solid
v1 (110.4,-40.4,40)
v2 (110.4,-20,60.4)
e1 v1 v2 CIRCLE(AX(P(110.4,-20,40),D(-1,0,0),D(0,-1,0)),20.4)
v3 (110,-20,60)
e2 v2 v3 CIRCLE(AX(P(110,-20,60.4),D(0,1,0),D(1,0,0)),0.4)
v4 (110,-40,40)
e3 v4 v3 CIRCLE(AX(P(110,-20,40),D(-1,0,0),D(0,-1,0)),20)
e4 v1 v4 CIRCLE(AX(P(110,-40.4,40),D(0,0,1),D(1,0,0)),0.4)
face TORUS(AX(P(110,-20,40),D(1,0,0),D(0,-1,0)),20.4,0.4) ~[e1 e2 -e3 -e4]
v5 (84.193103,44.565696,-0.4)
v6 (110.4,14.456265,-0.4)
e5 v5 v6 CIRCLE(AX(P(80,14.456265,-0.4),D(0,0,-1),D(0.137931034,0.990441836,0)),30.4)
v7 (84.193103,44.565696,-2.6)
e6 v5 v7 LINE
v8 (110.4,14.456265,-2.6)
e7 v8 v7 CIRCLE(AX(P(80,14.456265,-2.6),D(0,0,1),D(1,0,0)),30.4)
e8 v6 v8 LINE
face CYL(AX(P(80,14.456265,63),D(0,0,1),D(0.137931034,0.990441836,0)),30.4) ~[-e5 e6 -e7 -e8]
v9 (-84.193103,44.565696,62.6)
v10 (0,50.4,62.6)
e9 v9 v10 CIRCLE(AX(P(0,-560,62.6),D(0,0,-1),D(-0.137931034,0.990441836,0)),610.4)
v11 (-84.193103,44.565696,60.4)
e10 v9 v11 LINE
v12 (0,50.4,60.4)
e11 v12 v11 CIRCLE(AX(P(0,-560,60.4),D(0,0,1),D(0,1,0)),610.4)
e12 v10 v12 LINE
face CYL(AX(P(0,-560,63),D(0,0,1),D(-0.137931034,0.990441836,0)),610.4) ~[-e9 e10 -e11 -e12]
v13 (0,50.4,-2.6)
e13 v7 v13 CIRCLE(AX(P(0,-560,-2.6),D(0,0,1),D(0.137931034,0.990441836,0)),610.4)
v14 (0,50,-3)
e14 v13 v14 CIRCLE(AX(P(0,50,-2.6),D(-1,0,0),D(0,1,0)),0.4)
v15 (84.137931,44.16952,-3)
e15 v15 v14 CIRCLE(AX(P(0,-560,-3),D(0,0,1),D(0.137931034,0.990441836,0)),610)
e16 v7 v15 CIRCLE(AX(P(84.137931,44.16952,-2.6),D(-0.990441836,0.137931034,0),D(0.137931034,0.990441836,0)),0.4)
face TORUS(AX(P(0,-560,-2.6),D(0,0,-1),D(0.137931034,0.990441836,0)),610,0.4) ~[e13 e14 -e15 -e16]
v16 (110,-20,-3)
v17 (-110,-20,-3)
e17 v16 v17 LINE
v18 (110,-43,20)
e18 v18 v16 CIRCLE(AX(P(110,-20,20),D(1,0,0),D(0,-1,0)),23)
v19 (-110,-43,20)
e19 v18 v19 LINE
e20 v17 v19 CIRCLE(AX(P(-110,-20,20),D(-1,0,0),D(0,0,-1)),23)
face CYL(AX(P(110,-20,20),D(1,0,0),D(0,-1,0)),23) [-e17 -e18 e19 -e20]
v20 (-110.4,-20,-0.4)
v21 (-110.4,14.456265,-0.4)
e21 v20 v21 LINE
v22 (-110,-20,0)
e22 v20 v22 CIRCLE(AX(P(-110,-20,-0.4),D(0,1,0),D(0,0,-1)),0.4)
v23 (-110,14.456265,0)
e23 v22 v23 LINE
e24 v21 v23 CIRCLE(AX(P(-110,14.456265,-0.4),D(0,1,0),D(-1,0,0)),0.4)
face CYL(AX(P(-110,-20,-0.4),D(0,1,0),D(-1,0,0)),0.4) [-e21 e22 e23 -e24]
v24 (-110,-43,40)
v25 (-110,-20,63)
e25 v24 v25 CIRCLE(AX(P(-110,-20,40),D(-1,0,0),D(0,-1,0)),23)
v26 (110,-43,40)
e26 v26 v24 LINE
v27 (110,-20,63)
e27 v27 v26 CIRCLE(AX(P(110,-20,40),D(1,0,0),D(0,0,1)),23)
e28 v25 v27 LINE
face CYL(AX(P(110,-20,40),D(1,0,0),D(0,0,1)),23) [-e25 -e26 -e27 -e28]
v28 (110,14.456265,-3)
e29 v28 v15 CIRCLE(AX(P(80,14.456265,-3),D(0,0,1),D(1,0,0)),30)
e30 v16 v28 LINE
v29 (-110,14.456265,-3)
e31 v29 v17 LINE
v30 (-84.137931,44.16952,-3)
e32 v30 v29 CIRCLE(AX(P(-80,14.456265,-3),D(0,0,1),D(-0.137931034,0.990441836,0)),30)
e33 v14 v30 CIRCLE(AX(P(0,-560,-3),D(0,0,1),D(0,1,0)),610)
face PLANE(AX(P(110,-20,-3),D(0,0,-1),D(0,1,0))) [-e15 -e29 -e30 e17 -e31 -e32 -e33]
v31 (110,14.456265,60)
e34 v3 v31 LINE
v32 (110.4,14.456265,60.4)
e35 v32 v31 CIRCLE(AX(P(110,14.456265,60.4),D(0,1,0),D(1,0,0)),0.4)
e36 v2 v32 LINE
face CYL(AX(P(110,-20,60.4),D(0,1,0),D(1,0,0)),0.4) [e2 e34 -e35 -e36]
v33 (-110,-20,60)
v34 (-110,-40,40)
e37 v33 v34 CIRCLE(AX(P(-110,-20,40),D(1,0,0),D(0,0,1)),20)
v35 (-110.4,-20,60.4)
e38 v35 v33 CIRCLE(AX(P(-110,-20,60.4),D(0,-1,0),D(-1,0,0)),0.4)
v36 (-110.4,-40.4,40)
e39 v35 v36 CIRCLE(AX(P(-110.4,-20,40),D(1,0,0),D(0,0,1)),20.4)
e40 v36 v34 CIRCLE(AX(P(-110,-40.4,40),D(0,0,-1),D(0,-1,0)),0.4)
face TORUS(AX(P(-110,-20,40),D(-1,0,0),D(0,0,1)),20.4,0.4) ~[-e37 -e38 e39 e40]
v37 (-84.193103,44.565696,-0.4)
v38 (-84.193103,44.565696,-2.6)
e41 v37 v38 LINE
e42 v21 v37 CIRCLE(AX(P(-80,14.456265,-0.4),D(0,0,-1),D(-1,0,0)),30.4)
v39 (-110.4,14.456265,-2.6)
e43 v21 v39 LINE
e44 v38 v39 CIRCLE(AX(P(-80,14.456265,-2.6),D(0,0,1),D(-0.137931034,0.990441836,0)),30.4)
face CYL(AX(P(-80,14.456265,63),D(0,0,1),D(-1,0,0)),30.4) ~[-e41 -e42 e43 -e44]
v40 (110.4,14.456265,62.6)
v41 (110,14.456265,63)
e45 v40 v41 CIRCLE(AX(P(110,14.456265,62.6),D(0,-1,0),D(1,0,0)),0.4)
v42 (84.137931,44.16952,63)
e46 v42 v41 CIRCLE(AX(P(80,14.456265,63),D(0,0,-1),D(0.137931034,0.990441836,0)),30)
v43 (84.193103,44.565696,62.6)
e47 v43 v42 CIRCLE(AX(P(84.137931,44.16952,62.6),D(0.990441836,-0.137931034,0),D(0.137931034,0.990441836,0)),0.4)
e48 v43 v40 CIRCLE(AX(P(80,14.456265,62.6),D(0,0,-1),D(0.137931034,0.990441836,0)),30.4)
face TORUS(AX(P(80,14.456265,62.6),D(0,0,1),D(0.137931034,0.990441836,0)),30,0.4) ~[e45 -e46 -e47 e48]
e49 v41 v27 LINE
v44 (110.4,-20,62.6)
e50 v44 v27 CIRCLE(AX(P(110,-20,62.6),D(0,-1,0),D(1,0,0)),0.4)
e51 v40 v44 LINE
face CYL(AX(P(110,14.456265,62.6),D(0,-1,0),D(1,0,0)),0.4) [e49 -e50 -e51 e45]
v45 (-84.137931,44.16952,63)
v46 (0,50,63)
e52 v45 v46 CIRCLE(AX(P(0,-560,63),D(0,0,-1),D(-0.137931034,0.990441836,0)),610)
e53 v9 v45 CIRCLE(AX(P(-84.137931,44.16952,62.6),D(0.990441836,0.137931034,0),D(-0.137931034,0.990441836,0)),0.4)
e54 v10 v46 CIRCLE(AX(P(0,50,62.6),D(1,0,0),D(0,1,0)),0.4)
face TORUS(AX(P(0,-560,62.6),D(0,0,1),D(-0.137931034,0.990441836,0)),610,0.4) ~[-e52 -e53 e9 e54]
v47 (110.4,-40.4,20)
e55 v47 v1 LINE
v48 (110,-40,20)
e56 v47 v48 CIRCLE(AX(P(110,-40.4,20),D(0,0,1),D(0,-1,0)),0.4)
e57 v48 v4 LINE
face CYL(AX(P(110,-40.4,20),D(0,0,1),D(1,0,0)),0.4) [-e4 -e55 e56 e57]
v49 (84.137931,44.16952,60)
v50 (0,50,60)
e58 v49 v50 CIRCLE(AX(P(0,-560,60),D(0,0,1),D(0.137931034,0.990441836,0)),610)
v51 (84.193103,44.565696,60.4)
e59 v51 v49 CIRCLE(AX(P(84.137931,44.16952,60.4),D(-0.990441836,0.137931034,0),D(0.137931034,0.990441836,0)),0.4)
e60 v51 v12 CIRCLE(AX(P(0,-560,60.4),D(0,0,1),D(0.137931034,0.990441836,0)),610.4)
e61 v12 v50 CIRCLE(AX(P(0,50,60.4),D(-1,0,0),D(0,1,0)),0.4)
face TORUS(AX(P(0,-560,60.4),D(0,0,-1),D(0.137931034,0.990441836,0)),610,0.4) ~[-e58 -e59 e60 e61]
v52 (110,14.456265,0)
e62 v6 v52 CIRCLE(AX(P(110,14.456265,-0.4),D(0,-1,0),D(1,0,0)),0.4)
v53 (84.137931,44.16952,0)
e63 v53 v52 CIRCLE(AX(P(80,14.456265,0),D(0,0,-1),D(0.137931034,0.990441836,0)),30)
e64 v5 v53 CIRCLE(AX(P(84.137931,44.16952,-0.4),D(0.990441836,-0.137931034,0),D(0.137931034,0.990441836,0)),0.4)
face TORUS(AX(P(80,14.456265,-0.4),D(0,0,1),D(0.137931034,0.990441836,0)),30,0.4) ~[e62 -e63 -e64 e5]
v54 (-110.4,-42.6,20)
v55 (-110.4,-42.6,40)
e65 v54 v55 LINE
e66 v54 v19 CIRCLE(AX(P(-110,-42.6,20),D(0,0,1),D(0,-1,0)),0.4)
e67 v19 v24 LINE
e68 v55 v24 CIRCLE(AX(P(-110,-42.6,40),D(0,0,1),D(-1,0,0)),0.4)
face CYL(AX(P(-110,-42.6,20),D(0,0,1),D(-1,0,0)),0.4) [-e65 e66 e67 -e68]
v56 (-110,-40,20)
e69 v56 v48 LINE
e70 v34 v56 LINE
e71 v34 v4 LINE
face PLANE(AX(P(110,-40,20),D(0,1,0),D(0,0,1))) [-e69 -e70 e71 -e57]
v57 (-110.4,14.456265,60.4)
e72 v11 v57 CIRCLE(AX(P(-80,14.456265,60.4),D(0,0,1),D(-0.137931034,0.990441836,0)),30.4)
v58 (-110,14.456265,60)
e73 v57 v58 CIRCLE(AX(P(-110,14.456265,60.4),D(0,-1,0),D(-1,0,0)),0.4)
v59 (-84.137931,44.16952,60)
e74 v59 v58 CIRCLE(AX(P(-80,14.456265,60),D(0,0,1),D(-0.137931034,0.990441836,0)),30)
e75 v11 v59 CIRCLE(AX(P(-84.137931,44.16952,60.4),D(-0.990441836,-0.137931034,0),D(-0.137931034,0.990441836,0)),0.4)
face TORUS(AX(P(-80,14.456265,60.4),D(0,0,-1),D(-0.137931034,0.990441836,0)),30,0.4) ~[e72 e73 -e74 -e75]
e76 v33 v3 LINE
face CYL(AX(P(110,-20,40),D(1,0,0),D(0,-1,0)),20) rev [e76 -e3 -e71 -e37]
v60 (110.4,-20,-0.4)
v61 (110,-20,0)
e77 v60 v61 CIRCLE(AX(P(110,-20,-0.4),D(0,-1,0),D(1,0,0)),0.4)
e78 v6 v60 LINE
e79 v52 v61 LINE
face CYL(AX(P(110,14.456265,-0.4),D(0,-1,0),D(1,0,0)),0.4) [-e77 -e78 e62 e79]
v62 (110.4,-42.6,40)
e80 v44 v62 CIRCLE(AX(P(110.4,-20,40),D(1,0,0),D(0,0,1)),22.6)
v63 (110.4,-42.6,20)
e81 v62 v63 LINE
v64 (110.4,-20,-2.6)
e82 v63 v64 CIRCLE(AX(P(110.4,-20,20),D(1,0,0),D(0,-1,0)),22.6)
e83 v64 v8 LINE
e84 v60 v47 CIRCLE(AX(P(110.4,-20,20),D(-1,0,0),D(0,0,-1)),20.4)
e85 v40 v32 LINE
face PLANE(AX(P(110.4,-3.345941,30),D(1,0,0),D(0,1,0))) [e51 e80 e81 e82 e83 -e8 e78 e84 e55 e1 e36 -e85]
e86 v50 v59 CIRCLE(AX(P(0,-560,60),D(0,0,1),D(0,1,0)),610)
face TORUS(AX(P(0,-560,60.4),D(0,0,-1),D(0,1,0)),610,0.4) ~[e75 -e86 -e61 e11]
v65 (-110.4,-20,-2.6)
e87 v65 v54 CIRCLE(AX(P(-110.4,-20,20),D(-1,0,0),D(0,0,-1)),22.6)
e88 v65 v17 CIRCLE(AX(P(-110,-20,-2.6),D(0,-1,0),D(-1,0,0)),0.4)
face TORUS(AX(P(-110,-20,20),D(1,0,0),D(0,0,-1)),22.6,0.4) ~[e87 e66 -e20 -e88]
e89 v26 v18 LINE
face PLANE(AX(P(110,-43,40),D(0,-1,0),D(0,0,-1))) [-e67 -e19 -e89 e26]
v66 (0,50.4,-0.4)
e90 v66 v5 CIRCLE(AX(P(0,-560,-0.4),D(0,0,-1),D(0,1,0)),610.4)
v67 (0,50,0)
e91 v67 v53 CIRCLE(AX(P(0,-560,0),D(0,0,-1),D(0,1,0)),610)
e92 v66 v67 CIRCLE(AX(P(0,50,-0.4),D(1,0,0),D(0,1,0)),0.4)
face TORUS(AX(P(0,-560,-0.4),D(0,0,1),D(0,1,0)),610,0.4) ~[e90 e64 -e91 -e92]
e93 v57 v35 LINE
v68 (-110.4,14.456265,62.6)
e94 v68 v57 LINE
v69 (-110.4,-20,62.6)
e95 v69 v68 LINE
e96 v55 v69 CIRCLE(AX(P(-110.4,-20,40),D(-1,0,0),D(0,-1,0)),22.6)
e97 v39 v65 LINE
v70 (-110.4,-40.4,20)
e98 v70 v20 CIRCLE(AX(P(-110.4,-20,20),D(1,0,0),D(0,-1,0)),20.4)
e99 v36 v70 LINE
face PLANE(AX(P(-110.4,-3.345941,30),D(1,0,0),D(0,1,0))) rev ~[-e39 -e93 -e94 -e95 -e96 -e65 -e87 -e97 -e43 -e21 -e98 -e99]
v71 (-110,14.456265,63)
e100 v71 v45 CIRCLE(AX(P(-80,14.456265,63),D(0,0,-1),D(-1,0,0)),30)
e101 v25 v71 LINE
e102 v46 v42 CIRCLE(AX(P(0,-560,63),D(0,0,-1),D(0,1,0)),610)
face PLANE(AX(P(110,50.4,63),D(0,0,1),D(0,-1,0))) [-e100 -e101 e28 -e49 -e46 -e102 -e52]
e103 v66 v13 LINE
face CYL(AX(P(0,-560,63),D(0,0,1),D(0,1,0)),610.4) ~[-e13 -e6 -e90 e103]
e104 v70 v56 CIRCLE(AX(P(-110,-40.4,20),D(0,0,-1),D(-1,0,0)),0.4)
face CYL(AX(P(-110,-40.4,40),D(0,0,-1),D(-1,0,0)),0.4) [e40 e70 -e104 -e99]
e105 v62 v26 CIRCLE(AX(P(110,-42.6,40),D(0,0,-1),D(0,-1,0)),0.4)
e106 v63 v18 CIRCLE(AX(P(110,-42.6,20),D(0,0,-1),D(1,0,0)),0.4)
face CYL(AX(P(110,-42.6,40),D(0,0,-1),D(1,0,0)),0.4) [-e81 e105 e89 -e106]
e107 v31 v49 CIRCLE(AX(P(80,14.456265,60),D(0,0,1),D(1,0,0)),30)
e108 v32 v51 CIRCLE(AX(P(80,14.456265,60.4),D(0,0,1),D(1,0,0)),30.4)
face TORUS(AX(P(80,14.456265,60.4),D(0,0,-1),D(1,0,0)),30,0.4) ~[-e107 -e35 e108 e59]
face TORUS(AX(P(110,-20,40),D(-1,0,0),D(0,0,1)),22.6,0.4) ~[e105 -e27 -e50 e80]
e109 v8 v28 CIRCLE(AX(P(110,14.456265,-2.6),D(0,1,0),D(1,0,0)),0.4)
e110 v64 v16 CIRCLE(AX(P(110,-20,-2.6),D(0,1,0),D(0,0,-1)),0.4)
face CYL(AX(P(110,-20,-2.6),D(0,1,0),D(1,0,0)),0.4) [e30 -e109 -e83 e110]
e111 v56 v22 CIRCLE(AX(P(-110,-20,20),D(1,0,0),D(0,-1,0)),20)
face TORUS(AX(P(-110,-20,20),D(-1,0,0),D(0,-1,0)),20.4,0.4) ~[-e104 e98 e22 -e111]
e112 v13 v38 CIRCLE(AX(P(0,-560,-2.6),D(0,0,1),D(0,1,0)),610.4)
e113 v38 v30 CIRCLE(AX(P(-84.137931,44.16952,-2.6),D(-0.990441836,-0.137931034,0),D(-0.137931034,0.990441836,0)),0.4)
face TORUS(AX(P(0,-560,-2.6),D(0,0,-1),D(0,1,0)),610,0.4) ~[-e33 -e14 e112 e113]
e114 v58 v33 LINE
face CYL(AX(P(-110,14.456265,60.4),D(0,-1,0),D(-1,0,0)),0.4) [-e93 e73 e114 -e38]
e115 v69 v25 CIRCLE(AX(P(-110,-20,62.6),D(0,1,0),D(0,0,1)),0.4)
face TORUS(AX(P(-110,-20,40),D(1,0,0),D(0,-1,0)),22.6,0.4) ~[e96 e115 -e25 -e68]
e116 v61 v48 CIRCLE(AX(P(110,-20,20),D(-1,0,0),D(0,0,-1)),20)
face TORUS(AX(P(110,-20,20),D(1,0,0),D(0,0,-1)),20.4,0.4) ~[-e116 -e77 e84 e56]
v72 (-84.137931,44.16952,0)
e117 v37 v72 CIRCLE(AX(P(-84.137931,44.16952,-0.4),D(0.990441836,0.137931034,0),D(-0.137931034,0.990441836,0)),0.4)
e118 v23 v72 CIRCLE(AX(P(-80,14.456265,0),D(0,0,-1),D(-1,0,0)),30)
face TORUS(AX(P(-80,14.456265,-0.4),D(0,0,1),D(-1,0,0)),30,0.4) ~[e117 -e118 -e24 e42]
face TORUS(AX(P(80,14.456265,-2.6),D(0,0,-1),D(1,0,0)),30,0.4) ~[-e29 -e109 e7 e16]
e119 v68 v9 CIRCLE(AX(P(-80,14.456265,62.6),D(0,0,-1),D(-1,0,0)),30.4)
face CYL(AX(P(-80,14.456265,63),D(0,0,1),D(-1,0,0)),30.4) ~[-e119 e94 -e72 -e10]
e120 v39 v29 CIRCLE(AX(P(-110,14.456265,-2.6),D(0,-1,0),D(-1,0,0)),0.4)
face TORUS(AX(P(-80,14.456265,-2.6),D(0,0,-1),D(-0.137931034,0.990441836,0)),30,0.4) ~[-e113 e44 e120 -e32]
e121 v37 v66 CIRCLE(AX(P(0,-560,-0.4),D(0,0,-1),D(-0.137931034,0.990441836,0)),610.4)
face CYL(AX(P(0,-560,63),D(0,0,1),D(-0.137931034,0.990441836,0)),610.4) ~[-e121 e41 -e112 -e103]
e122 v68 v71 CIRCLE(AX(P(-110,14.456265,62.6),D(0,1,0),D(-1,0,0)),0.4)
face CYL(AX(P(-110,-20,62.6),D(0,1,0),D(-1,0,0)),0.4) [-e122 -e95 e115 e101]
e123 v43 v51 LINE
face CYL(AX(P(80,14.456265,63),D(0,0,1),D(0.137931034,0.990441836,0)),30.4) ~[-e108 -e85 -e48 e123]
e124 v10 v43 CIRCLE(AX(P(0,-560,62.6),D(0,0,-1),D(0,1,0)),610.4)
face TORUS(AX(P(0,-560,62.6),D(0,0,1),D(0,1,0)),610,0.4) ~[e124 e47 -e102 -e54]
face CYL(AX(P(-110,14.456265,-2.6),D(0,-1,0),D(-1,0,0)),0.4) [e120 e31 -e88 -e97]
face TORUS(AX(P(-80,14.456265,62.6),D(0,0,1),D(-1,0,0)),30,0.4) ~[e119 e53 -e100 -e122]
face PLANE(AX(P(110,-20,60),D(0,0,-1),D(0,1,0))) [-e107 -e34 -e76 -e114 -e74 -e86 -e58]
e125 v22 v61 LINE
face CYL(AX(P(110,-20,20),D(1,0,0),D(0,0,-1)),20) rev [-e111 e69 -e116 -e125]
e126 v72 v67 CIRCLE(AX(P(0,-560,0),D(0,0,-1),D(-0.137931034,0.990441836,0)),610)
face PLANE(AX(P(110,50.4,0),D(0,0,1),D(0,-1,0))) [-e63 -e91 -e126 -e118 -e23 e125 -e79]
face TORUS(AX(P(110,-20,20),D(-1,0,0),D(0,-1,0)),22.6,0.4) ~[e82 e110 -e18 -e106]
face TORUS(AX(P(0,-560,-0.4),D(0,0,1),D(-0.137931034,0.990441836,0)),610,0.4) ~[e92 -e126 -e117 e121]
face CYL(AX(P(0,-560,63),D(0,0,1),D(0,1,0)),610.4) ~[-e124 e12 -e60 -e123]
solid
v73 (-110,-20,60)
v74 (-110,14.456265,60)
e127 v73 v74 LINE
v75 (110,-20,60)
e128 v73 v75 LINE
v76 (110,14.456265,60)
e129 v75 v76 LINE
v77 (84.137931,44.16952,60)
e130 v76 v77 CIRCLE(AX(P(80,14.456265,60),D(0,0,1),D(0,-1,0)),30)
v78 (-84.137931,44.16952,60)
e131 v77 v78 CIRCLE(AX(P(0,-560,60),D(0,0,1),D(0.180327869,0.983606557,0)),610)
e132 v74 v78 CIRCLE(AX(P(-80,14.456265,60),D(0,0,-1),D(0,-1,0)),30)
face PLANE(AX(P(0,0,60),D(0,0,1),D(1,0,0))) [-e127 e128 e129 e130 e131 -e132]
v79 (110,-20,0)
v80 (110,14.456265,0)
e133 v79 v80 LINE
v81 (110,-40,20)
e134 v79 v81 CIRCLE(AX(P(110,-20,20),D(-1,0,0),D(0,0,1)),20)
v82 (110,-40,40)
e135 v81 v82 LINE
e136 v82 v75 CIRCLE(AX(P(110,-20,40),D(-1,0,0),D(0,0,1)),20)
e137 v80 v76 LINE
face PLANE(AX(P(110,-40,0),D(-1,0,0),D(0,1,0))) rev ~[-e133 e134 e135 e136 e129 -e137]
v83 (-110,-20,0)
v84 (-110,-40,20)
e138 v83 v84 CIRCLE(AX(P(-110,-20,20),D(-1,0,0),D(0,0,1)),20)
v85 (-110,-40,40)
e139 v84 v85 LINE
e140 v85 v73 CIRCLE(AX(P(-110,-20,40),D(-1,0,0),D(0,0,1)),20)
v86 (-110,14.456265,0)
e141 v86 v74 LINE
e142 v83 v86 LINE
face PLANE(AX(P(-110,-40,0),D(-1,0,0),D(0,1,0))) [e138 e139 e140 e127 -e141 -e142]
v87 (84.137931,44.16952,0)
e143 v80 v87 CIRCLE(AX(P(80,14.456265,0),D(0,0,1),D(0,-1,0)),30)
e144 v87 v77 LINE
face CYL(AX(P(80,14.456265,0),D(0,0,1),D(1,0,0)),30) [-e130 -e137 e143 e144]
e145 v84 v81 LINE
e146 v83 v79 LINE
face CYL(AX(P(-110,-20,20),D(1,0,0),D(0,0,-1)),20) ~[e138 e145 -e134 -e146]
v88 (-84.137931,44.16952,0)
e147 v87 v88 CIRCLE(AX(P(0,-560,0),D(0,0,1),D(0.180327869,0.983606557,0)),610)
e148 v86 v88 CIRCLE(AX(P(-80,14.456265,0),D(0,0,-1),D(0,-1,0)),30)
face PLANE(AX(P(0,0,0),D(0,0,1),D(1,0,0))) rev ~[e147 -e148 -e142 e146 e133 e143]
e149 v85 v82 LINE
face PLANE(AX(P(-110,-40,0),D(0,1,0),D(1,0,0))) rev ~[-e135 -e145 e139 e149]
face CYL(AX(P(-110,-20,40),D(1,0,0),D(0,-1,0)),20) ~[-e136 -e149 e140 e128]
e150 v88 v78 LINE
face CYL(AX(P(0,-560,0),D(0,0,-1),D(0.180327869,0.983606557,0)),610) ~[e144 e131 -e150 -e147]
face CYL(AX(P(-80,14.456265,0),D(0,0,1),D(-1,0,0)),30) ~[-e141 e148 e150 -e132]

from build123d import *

# Parameters (mm, degrees)
F0_W     = 220
F0_H     = 80
F1_DEPTH = 60
F2_R     = 30
F3_R     = 20
F5_DEPTH = 0.4
F6_DEPTH = 220.4
F9_DEPTH = 66
F10_R    = 0.4


with BuildPart() as f1:
    # F0 (on Top) → F1 (new body)
    with BuildSketch(Plane.XY):
        Rectangle(F0_W, F0_H)
        with BuildLine():
            Line((-110, 40), (110, 40))
            ThreePointArc((110, 40), (0, 50), (-110, 40))
        make_face()
    extrude(amount=F1_DEPTH)

    # F2
    f2_edges = [f1.edges().sort_by_distance(p)[0] for p in [
        (-110, 40, 30),
        (110, 40, 30),
    ]]
    fillet(f2_edges, radius=F2_R)

    # F3
    f3_edges = [f1.edges().sort_by_distance(p)[0] for p in [
        (0, -40, 60),
        (0, -40, 0),
    ]]
    fillet(f3_edges, radius=F3_R)


with BuildPart() as f5:
    # F4 (on face) → F5 (new body)
    with BuildSketch(Plane.YZ.offset(110)):
        with BuildLine():
            Line((-20, -3), (14.4562646538, -3))
            Line((14.4562646538, -3), (50.4, -3))
            Line((50.4, -3), (50.4, 0))
            Line((50.4, 0), (50, 0))
            Line((50, 0), (44.1695197221, 0))
            Line((44.1695197221, 0), (14.4562646538, 0))
            Line((14.4562646538, 0), (-20, 0))
            ThreePointArc((-20, 0), (-34.1421356237, 5.8578643763), (-40, 20))
            Line((-40, 20), (-40, 40))
            ThreePointArc((-40, 40), (-34.1421356237, 54.1421356237), (-20, 60))
            Line((-20, 60), (14.4562646538, 60))
            Line((14.4562646538, 60), (44.1695197221, 60))
            Line((44.1695197221, 60), (50, 60))
            Line((50, 60), (50.4, 60))
            Line((50.4, 60), (50.4, 63))
            Line((50.4, 63), (14.4562646538, 63))
            Line((14.4562646538, 63), (-20, 63))
            ThreePointArc((-20, 63), (-36.2634559673, 56.2634559673), (-43, 40))
            Line((-43, 40), (-43, 20))
            ThreePointArc((-43, 20), (-36.2634559673, 3.7365440327), (-20, -3))
        make_face()
    extrude(amount=F5_DEPTH)

    # F6 (add): a face of the model
    f6_faces = [f5.faces().sort_by_distance(p)[0] for p in [
        (110, -35.4547669047, 55.4547669047),
    ]]
    extrude(f6_faces, amount=F6_DEPTH)

    # F7: union 

    # F8 (on face) → F9 (cut, through all)
    with BuildSketch(Plane.XY.offset(63)):
        with BuildLine():
            Line((-110.4, 50.4), (-110.4, 14.4562646538))
            ThreePointArc((-110.4, 14.4562646538), (-102.9306600955, 34.4148424485), (-84.1931034483, 44.5656964563))
            ThreePointArc((-84.1931034483, 44.5656964563), (-42.1975051576, 48.9396772739), (0, 50.4))
            Line((0, 50.4), (-110.4, 50.4))
        make_face()
        with BuildLine():
            Line((110.4, 50.4), (0, 50.4))
            ThreePointArc((0, 50.4), (42.1975051575, 48.9396772739), (84.1931034483, 44.5656964563))
            ThreePointArc((84.1931034483, 44.5656964563), (102.9306600955, 34.4148424485), (110.4, 14.4562646538))
            Line((110.4, 14.4562646538), (110.4, 50.4))
        make_face()
    extrude(amount=-F9_DEPTH, mode=Mode.SUBTRACT)

    # F10
    f10_edges = [f5.edges().sort_by_distance(p)[0] for p in [
        (110.4, -2.771868, 63),
        (110.4, 14.456265, 61.5),
        (110.4, -2.771868, 60),
        (110.4, -34.142136, 54.142136),
        (110.4, -40, 30),
        (110.4, -34.142136, 5.857864),
        (110.4, -2.771868, 0),
        (110.4, 14.456265, -1.5),
        (110.4, -2.771868, -3),
        (110.4, -36.263456, 3.736544),
        (110.4, -43, 30),
        (110.4, -36.263456, 56.263456),
        (102.93066, 34.414842, 0),
        (102.93066, 34.414842, -3),
        (84.193103, 44.565696, -1.5),
        (102.93066, 34.414842, 63),
        (102.93066, 34.414842, 60),
        (84.193103, 44.565696, 61.5),
        (-102.93066, 34.414842, 0),
        (-84.193103, 44.565696, -1.5),
        (-102.93066, 34.414842, -3),
        (-110.4, 14.456265, -1.5),
        (-102.93066, 34.414842, 63),
        (-84.193103, 44.565696, 61.5),
        (-102.93066, 34.414842, 60),
        (-110.4, 14.456265, 61.5),
        (-110.4, -2.771868, 63),
        (-110.4, -2.771868, 60),
        (-110.4, -34.142136, 54.142136),
        (-110.4, -40, 30),
        (-110.4, -34.142136, 5.857864),
        (-110.4, -2.771868, 0),
        (-110.4, -2.771868, -3),
        (-110.4, -36.263456, 3.736544),
        (-110.4, -43, 30),
        (-110.4, -36.263456, 56.263456),
        (0, 50.4, -3),
        (0, 50.4, 0),
        (0, 50.4, 60),
        (0, 50.4, 63),
    ]]
    fillet(f10_edges, radius=F10_R)


solid = Compound([f1.part, f5.part])
